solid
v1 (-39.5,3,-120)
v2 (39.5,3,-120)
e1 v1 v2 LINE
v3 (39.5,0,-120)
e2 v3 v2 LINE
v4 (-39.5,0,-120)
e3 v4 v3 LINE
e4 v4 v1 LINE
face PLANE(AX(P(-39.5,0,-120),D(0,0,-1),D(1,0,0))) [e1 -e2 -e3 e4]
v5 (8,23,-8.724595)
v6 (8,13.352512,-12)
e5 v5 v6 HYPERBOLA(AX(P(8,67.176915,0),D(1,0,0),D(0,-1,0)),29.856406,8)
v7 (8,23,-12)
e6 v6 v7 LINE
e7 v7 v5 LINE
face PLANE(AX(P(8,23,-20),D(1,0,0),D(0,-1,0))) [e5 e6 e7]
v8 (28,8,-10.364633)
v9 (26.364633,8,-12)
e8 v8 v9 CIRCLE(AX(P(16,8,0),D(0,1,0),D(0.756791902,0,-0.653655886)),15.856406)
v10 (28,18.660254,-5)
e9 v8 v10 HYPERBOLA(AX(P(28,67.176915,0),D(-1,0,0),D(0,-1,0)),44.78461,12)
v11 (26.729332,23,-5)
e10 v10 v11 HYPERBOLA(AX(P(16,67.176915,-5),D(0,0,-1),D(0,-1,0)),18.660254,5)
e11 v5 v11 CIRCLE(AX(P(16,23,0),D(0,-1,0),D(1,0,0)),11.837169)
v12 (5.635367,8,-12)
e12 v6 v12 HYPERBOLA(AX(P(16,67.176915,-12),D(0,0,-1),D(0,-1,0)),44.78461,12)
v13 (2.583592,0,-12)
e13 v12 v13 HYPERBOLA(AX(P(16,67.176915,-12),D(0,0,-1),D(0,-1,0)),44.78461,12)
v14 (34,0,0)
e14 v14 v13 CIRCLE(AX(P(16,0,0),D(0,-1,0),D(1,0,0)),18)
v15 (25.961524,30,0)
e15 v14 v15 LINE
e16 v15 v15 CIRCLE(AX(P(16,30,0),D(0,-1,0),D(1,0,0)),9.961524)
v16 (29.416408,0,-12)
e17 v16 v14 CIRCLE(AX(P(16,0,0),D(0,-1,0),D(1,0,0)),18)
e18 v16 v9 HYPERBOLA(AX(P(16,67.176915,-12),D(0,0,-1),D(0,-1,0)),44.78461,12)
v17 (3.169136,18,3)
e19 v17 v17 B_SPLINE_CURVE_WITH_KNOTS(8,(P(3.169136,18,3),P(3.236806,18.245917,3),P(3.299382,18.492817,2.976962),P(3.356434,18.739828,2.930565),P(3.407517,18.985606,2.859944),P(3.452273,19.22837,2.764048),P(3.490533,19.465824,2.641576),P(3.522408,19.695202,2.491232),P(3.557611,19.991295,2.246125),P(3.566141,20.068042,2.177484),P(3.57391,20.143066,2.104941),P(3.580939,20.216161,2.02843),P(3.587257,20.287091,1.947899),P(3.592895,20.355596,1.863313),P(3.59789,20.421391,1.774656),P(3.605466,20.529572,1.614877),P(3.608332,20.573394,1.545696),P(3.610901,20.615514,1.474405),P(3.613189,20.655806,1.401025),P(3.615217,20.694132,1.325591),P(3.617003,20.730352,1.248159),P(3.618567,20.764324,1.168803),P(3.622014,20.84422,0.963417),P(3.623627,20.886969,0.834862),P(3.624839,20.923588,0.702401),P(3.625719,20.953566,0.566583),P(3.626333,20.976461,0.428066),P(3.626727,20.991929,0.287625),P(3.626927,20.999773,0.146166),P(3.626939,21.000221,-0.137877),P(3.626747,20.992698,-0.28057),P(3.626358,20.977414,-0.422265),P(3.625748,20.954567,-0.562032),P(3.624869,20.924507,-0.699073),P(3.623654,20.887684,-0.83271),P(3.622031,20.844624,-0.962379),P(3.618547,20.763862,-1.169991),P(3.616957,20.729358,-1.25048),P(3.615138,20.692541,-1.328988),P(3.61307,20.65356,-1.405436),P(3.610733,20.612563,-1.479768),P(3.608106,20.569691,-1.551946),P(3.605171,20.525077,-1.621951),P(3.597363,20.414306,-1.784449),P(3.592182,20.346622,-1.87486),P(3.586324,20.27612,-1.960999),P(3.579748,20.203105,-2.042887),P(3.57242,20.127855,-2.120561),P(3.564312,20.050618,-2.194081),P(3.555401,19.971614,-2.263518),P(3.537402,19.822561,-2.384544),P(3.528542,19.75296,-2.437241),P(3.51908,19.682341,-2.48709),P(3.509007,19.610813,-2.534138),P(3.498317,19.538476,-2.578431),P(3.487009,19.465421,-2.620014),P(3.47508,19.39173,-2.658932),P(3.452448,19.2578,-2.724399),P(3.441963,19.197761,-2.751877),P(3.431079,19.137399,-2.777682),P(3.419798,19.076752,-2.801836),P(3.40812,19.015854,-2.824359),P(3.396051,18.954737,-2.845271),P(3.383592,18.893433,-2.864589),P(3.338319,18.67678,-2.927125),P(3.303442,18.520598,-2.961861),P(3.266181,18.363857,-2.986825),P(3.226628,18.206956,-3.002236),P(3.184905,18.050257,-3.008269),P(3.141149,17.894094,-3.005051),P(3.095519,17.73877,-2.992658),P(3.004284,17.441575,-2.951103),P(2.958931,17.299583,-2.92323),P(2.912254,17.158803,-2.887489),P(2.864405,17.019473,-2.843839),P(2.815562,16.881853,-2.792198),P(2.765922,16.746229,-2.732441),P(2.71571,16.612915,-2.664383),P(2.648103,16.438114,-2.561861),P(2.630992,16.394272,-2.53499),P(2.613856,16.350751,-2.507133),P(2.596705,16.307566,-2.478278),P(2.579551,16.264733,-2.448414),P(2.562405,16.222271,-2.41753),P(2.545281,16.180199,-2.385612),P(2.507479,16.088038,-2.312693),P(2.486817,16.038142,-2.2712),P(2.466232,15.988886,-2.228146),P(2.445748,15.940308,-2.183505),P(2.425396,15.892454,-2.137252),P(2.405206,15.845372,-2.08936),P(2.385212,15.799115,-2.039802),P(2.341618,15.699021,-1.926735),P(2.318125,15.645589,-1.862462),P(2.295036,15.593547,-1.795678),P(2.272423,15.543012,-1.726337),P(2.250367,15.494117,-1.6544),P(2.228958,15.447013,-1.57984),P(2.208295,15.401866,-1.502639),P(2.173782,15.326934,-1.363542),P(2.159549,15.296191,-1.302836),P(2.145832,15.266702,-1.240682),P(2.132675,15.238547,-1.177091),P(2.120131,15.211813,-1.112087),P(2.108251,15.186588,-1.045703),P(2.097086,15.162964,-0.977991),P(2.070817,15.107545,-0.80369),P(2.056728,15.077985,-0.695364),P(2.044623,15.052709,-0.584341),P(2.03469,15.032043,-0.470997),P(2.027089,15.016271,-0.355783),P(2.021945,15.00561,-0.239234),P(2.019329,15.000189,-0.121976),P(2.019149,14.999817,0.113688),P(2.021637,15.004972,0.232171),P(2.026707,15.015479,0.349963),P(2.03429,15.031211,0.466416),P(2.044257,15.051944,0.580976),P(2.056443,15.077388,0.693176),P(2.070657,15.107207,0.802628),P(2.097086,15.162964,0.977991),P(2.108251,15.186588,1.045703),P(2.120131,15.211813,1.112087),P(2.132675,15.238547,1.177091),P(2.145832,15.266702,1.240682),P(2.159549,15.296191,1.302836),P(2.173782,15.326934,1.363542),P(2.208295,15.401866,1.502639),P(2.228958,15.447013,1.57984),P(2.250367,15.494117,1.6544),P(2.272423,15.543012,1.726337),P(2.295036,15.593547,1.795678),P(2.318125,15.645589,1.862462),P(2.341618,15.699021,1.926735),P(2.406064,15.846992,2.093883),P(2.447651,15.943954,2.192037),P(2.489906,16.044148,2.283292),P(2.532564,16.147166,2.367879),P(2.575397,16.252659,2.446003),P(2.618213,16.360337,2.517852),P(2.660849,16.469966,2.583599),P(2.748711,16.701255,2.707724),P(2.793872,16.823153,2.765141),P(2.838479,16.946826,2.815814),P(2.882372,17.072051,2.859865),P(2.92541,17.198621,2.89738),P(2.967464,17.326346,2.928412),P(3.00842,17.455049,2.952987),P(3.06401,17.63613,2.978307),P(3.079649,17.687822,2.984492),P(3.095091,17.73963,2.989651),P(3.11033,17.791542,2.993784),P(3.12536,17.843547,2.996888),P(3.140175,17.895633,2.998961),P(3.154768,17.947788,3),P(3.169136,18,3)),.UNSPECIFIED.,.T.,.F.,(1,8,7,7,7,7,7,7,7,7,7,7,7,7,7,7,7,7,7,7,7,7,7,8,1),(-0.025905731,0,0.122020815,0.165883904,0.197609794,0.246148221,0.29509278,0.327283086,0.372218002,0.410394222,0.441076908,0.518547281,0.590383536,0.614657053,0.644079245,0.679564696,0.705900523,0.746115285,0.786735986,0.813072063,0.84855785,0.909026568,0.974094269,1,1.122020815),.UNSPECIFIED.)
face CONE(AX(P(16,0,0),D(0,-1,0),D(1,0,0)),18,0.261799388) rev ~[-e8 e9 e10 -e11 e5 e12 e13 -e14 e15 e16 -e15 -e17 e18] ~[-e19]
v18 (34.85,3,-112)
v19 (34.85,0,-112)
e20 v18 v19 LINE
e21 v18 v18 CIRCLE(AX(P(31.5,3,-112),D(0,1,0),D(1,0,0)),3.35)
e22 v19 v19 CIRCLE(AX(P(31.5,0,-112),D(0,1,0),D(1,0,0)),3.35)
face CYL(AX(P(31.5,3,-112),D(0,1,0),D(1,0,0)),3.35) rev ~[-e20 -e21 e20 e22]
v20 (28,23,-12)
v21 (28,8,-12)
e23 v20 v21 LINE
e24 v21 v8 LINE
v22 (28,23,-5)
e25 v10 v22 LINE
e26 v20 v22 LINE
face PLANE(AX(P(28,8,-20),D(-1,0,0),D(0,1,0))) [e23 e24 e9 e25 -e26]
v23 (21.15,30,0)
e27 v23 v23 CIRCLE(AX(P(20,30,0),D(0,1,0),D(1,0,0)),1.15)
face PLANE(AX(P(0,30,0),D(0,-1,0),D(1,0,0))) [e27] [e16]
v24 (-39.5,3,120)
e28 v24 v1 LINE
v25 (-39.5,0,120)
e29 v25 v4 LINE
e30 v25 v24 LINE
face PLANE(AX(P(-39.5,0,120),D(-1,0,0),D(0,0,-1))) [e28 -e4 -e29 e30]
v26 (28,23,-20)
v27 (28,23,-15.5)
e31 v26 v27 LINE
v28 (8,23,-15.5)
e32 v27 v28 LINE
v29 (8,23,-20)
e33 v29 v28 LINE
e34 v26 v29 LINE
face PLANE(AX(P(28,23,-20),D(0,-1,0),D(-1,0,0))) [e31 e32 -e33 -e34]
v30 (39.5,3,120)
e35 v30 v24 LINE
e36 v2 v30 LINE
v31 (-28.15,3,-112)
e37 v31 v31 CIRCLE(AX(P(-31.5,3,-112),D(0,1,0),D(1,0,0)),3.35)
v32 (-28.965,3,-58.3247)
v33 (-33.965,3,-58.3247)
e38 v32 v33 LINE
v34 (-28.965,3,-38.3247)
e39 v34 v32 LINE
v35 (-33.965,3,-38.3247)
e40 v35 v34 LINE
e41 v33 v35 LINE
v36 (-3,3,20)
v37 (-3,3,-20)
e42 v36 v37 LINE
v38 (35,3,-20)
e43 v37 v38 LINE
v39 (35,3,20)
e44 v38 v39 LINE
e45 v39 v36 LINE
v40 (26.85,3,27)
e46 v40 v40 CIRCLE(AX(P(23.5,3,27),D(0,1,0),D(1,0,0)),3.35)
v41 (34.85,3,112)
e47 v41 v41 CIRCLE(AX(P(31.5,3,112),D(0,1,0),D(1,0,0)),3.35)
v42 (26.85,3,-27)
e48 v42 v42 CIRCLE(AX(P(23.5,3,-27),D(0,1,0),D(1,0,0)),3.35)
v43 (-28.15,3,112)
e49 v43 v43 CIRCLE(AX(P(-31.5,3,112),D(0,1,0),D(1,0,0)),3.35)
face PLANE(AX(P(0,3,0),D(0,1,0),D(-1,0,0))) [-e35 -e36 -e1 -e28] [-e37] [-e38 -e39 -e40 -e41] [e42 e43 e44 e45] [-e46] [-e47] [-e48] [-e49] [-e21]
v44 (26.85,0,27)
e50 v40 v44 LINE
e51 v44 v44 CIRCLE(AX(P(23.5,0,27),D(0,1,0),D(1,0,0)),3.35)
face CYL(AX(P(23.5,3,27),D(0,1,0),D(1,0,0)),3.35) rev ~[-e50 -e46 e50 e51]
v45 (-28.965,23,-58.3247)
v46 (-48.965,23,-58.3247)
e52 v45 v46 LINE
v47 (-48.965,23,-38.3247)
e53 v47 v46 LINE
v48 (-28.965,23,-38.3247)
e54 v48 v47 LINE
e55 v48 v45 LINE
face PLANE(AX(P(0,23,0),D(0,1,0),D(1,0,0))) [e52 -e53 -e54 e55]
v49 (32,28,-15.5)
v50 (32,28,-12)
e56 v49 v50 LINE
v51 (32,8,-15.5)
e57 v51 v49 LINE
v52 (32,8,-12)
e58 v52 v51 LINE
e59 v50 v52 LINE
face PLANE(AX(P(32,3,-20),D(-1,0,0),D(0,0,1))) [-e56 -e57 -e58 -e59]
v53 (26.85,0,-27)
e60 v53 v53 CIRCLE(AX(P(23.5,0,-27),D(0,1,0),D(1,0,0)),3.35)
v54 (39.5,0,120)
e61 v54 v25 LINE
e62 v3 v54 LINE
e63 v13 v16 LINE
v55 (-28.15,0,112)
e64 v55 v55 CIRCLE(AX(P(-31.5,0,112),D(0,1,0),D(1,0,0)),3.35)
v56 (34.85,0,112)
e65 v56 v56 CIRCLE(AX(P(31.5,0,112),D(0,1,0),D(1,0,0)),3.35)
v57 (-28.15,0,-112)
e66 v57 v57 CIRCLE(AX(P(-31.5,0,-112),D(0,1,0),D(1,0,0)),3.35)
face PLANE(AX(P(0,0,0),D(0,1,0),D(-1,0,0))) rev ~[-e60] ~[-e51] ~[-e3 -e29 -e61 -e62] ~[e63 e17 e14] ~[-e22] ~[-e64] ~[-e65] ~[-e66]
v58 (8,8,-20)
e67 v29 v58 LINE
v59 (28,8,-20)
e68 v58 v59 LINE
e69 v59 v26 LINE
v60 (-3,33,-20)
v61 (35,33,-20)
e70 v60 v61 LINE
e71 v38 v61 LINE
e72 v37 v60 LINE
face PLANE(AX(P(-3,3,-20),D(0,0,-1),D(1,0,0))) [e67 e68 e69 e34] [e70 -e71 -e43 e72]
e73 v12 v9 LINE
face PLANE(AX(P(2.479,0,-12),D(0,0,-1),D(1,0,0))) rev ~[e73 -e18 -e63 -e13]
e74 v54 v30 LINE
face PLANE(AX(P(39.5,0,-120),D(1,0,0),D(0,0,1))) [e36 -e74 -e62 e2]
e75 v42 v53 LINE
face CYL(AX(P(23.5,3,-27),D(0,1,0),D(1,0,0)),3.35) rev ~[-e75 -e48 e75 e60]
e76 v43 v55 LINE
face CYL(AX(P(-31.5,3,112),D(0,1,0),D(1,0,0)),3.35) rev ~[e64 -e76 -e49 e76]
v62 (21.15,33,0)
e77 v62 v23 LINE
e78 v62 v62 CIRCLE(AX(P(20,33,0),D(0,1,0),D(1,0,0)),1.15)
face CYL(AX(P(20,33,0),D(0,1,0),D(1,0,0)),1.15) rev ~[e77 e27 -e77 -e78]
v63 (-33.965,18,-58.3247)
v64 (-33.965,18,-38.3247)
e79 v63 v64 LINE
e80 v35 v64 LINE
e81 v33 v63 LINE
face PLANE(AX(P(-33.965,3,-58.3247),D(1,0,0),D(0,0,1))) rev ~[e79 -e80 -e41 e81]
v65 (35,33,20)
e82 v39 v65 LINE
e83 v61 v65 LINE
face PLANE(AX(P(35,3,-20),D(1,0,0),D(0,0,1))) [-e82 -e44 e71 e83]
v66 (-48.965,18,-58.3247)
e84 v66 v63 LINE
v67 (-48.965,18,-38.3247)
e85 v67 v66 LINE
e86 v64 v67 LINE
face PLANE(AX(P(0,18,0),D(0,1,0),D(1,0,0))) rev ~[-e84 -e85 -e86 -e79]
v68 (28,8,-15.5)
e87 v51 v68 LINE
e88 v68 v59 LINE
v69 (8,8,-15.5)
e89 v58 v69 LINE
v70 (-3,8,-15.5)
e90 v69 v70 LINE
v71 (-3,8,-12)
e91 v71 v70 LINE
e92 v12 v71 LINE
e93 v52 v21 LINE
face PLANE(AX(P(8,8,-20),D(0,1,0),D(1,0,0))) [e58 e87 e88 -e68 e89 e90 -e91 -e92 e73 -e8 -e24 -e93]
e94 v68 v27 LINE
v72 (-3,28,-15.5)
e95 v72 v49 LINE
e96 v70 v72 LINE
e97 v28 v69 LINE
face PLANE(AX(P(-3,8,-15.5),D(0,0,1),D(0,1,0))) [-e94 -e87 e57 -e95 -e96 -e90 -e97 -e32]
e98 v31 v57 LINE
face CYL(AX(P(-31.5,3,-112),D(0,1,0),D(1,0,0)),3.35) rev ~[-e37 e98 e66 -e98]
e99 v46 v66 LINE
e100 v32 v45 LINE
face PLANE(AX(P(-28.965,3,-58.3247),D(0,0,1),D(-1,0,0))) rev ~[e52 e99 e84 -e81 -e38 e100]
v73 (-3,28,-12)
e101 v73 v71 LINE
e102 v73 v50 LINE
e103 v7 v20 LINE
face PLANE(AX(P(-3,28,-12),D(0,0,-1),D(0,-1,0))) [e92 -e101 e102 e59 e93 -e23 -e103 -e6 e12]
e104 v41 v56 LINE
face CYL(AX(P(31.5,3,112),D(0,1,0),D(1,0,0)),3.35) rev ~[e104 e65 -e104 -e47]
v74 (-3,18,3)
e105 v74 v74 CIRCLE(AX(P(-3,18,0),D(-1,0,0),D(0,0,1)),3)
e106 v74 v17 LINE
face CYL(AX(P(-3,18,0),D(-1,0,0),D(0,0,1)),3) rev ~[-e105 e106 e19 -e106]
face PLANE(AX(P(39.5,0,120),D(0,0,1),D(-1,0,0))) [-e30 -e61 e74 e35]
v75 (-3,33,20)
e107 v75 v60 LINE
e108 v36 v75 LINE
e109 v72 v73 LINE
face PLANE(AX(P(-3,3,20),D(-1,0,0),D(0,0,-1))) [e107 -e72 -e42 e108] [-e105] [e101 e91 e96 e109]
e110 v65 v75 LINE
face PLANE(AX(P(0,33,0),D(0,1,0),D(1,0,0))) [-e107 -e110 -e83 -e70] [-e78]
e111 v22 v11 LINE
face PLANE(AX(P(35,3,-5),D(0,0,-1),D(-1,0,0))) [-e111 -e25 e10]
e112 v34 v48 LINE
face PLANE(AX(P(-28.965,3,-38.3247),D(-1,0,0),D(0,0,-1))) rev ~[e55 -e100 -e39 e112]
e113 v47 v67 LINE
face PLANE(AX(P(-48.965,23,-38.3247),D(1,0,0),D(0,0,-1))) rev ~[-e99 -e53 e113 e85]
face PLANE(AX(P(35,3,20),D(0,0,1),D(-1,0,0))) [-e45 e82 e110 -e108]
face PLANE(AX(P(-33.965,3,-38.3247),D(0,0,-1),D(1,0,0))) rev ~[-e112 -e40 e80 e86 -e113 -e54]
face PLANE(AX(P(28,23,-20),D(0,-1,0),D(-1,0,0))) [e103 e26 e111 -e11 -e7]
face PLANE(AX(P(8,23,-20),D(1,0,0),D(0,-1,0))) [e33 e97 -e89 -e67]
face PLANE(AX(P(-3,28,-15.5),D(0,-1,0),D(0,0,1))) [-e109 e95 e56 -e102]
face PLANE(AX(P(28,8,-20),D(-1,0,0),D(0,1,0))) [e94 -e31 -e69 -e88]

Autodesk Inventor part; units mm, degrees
ref_plane "YZ Plane" through (0, 0, 0) normal (1, 0, 0) x (0, 1, 0)
ref_plane "XZ Plane" through (0, 0, 0) normal (0, 1, 0) x (-1, 0, 0)
ref_plane "XY Plane" through (0, 0, 0) normal (0, 0, 1) x (1, 0, 0)
sketch "Sketch44" plane through (0, 0, 0) normal (0, 1, 0) x (-1, 0, 0)
  line L0 (-39.5, 120) -> (39.5, 120)
  line L1 (39.5, 120) -> (39.5, -120)
  line L2 (39.5, -120) -> (-39.5, -120)
  line L3 (-39.5, -120) -> (-39.5, 120)
  line L4 (-39.5, 120) -> (39.5, -120) construction
  line L5 (39.5, 120) -> (-39.5, -120) construction
  point P0 (0, 0)
  dimension "d138" = 79
  dimension "d139" = 240
extrude "Extrusion33" add sketch "Sketch44" along normal blind 3
sketch "Sketch45" plane through (0, 3, 0) normal (0, 1, 0) x (1, 0, 0)
  line L0 (35, -20) -> (-3, -20)
  line L1 (-3, -20) -> (-3, 20)
  line L2 (-3, 20) -> (35, 20)
  line L3 (35, 20) -> (35, -20)
  point P0 (0, 0)
  dimension "d142" = 38
  dimension "d143" = 40
extrude "Extrusion34" add sketch "Sketch45" along normal blind 30
sketch "Sketch47" plane through (0, 0, 0) normal (0, -1, 0) x (1, 0, 0)
  circle A0 centre (16, 0) radius 18
  point P0 (0, 0)
  dimension "d146" = 36
extrude "Extrusion35" cut sketch "Sketch47" against normal blind 30 draft -15
sketch "Sketch58" plane through (35, 3, -20) normal (0, 0, -1) x (-1, 0, 0)
  line L0 (7, 20) -> (27, 20)
  line L1 (27, 20) -> (27, 5)
  line L2 (27, 5) -> (7, 5)
  line L3 (7, 5) -> (7, 20)
  point P0 (35, -3)
  dimension "d156" = 20
  dimension "d157" = 15
extrude "Extrusion38" cut sketch "Sketch58" against normal blind 15
sketch "Sketch59" plane through (-3, 3, -20) normal (-1, 0, 0) x (0, 0, 1)
  line L0 (4.5, 25) -> (8, 25)
  line L1 (8, 25) -> (8, 5)
  line L2 (8, 5) -> (4.5, 5)
  line L3 (4.5, 5) -> (4.5, 25)
  point P0 (20, -3)
  dimension "d160" = 3.5
  dimension "d161" = 20
extrude "Extrusion39" cut sketch "Sketch59" against normal blind 35
sketch "Sketch60" plane through (0, 3, 0) normal (0, 1, 0) x (1, 0, 0)
  line L0 (-33.965, 38.3247) -> (-28.965, 38.3247)
  line L1 (-28.965, 38.3247) -> (-28.965, 58.3247)
  line L2 (-28.965, 58.3247) -> (-33.965, 58.3247)
  line L3 (-33.965, 58.3247) -> (-33.965, 38.3247)
  point P0 (0, 0)
  dimension "d164" = 5
  dimension "d165" = 20
extrude "Extrusion40" add sketch "Sketch60" along normal blind 20
sketch "Sketch61" plane through (0, 23, 0) normal (0, 1, 0) x (1, 0, 0)
  line L0 (-28.965, 38.3247) -> (-28.965, 58.3247) projected
  line L1 (-28.965, 38.3247) -> (-48.965, 38.3247)
  line L2 (-48.965, 38.3247) -> (-48.965, 58.3247)
  line L3 (-48.965, 58.3247) -> (-28.965, 58.3247)
  line L4 (-28.965, 58.3247) -> (-28.965, 38.3247)
  point P0 (0, 0)
  dimension "d168" = 20
  dimension "d169" = 20
extrude "Extrusion41" add sketch "Sketch61" against normal blind 5
sketch "Sketch65" plane through (-3, 3, -20) normal (-1, 0, 0) x (0, 0, 1)
  circle A0 centre (20, 15) radius 3
  point P0 (20, -3)
  dimension "d176" = 6
extrude "Extrusion43" cut sketch "Sketch65" against normal blind 10
sketch "Sketch68" plane through (0, 3, 0) normal (0, 1, 0) x (1, 0, 0)
  circle A0 centre (-31.5, -112) radius 3.35
  circle A1 centre (31.5, -112) radius 3.35
  circle A2 centre (-31.5, 112) radius 3.35
  circle A3 centre (31.5, 112) radius 3.35
  point P0 (0, 0)
  dimension "d192" = 6.7
  dimension "d193" = 6.7
  dimension "d194" = 6.7
  dimension "d195" = 6.7
extrude "Extrusion46" cut sketch "Sketch68" against normal through all
sketch "Sketch69" plane through (0, 3, 0) normal (0, 1, 0) x (1, 0, 0)
  circle A0 centre (23.5, -27) radius 3.35
  circle A1 centre (23.5, 27) radius 3.35
  point P0 (0, 0)
  dimension "d198" = 6.7
  dimension "d199" = 6.7
extrude "Extrusion47" cut sketch "Sketch69" against normal through all
sketch "Sketch70" plane through (0, 0, 0) normal (0, -1, 0) x (1, 0, 0)
  line L0 (-3, -12) -> (32, -12) projected
  line L1 (2.479, -12) -> (29.6644, -12)
  line L2 (29.6644, -12) -> (29.6644, -18.105)
  line L3 (29.6644, -18.105) -> (2.479, -18.105)
  line L4 (2.479, -18.105) -> (2.479, -12)
  point P0 (0, 0)
extrude "Extrusion48" add sketch "Sketch70" against normal blind 8
sketch "Sketch74" plane through (0, 33, 0) normal (0, 1, 0) x (1, 0, 0)
  circle A0 centre (20, 0) radius 1.15
  point P0 (0, 0)
  dimension "d210" = 2.3
extrude "Extrusion51" cut sketch "Sketch74" against normal blind 10
sketch "Sketch75" plane through (-3, 3, -20) normal (-1, 0, 0) x (0, 0, 1)
  line L0 (35.5, 25) -> (32, 25)
  line L1 (32, 25) -> (32, 5)
  line L2 (32, 5) -> (35.5, 5)
  line L3 (35.5, 5) -> (35.5, 25)
  point P0 (20, -3)
  dimension "d213" = 3.5
  dimension "d214" = 20
equation "\"d193\" = d192"
equation "\"d194\" = d192"
equation "\"d195\" = d192"
equation "\"d198\" = d192"
equation "\"d199\" = d192"
properties part number "liquid port_v11"
